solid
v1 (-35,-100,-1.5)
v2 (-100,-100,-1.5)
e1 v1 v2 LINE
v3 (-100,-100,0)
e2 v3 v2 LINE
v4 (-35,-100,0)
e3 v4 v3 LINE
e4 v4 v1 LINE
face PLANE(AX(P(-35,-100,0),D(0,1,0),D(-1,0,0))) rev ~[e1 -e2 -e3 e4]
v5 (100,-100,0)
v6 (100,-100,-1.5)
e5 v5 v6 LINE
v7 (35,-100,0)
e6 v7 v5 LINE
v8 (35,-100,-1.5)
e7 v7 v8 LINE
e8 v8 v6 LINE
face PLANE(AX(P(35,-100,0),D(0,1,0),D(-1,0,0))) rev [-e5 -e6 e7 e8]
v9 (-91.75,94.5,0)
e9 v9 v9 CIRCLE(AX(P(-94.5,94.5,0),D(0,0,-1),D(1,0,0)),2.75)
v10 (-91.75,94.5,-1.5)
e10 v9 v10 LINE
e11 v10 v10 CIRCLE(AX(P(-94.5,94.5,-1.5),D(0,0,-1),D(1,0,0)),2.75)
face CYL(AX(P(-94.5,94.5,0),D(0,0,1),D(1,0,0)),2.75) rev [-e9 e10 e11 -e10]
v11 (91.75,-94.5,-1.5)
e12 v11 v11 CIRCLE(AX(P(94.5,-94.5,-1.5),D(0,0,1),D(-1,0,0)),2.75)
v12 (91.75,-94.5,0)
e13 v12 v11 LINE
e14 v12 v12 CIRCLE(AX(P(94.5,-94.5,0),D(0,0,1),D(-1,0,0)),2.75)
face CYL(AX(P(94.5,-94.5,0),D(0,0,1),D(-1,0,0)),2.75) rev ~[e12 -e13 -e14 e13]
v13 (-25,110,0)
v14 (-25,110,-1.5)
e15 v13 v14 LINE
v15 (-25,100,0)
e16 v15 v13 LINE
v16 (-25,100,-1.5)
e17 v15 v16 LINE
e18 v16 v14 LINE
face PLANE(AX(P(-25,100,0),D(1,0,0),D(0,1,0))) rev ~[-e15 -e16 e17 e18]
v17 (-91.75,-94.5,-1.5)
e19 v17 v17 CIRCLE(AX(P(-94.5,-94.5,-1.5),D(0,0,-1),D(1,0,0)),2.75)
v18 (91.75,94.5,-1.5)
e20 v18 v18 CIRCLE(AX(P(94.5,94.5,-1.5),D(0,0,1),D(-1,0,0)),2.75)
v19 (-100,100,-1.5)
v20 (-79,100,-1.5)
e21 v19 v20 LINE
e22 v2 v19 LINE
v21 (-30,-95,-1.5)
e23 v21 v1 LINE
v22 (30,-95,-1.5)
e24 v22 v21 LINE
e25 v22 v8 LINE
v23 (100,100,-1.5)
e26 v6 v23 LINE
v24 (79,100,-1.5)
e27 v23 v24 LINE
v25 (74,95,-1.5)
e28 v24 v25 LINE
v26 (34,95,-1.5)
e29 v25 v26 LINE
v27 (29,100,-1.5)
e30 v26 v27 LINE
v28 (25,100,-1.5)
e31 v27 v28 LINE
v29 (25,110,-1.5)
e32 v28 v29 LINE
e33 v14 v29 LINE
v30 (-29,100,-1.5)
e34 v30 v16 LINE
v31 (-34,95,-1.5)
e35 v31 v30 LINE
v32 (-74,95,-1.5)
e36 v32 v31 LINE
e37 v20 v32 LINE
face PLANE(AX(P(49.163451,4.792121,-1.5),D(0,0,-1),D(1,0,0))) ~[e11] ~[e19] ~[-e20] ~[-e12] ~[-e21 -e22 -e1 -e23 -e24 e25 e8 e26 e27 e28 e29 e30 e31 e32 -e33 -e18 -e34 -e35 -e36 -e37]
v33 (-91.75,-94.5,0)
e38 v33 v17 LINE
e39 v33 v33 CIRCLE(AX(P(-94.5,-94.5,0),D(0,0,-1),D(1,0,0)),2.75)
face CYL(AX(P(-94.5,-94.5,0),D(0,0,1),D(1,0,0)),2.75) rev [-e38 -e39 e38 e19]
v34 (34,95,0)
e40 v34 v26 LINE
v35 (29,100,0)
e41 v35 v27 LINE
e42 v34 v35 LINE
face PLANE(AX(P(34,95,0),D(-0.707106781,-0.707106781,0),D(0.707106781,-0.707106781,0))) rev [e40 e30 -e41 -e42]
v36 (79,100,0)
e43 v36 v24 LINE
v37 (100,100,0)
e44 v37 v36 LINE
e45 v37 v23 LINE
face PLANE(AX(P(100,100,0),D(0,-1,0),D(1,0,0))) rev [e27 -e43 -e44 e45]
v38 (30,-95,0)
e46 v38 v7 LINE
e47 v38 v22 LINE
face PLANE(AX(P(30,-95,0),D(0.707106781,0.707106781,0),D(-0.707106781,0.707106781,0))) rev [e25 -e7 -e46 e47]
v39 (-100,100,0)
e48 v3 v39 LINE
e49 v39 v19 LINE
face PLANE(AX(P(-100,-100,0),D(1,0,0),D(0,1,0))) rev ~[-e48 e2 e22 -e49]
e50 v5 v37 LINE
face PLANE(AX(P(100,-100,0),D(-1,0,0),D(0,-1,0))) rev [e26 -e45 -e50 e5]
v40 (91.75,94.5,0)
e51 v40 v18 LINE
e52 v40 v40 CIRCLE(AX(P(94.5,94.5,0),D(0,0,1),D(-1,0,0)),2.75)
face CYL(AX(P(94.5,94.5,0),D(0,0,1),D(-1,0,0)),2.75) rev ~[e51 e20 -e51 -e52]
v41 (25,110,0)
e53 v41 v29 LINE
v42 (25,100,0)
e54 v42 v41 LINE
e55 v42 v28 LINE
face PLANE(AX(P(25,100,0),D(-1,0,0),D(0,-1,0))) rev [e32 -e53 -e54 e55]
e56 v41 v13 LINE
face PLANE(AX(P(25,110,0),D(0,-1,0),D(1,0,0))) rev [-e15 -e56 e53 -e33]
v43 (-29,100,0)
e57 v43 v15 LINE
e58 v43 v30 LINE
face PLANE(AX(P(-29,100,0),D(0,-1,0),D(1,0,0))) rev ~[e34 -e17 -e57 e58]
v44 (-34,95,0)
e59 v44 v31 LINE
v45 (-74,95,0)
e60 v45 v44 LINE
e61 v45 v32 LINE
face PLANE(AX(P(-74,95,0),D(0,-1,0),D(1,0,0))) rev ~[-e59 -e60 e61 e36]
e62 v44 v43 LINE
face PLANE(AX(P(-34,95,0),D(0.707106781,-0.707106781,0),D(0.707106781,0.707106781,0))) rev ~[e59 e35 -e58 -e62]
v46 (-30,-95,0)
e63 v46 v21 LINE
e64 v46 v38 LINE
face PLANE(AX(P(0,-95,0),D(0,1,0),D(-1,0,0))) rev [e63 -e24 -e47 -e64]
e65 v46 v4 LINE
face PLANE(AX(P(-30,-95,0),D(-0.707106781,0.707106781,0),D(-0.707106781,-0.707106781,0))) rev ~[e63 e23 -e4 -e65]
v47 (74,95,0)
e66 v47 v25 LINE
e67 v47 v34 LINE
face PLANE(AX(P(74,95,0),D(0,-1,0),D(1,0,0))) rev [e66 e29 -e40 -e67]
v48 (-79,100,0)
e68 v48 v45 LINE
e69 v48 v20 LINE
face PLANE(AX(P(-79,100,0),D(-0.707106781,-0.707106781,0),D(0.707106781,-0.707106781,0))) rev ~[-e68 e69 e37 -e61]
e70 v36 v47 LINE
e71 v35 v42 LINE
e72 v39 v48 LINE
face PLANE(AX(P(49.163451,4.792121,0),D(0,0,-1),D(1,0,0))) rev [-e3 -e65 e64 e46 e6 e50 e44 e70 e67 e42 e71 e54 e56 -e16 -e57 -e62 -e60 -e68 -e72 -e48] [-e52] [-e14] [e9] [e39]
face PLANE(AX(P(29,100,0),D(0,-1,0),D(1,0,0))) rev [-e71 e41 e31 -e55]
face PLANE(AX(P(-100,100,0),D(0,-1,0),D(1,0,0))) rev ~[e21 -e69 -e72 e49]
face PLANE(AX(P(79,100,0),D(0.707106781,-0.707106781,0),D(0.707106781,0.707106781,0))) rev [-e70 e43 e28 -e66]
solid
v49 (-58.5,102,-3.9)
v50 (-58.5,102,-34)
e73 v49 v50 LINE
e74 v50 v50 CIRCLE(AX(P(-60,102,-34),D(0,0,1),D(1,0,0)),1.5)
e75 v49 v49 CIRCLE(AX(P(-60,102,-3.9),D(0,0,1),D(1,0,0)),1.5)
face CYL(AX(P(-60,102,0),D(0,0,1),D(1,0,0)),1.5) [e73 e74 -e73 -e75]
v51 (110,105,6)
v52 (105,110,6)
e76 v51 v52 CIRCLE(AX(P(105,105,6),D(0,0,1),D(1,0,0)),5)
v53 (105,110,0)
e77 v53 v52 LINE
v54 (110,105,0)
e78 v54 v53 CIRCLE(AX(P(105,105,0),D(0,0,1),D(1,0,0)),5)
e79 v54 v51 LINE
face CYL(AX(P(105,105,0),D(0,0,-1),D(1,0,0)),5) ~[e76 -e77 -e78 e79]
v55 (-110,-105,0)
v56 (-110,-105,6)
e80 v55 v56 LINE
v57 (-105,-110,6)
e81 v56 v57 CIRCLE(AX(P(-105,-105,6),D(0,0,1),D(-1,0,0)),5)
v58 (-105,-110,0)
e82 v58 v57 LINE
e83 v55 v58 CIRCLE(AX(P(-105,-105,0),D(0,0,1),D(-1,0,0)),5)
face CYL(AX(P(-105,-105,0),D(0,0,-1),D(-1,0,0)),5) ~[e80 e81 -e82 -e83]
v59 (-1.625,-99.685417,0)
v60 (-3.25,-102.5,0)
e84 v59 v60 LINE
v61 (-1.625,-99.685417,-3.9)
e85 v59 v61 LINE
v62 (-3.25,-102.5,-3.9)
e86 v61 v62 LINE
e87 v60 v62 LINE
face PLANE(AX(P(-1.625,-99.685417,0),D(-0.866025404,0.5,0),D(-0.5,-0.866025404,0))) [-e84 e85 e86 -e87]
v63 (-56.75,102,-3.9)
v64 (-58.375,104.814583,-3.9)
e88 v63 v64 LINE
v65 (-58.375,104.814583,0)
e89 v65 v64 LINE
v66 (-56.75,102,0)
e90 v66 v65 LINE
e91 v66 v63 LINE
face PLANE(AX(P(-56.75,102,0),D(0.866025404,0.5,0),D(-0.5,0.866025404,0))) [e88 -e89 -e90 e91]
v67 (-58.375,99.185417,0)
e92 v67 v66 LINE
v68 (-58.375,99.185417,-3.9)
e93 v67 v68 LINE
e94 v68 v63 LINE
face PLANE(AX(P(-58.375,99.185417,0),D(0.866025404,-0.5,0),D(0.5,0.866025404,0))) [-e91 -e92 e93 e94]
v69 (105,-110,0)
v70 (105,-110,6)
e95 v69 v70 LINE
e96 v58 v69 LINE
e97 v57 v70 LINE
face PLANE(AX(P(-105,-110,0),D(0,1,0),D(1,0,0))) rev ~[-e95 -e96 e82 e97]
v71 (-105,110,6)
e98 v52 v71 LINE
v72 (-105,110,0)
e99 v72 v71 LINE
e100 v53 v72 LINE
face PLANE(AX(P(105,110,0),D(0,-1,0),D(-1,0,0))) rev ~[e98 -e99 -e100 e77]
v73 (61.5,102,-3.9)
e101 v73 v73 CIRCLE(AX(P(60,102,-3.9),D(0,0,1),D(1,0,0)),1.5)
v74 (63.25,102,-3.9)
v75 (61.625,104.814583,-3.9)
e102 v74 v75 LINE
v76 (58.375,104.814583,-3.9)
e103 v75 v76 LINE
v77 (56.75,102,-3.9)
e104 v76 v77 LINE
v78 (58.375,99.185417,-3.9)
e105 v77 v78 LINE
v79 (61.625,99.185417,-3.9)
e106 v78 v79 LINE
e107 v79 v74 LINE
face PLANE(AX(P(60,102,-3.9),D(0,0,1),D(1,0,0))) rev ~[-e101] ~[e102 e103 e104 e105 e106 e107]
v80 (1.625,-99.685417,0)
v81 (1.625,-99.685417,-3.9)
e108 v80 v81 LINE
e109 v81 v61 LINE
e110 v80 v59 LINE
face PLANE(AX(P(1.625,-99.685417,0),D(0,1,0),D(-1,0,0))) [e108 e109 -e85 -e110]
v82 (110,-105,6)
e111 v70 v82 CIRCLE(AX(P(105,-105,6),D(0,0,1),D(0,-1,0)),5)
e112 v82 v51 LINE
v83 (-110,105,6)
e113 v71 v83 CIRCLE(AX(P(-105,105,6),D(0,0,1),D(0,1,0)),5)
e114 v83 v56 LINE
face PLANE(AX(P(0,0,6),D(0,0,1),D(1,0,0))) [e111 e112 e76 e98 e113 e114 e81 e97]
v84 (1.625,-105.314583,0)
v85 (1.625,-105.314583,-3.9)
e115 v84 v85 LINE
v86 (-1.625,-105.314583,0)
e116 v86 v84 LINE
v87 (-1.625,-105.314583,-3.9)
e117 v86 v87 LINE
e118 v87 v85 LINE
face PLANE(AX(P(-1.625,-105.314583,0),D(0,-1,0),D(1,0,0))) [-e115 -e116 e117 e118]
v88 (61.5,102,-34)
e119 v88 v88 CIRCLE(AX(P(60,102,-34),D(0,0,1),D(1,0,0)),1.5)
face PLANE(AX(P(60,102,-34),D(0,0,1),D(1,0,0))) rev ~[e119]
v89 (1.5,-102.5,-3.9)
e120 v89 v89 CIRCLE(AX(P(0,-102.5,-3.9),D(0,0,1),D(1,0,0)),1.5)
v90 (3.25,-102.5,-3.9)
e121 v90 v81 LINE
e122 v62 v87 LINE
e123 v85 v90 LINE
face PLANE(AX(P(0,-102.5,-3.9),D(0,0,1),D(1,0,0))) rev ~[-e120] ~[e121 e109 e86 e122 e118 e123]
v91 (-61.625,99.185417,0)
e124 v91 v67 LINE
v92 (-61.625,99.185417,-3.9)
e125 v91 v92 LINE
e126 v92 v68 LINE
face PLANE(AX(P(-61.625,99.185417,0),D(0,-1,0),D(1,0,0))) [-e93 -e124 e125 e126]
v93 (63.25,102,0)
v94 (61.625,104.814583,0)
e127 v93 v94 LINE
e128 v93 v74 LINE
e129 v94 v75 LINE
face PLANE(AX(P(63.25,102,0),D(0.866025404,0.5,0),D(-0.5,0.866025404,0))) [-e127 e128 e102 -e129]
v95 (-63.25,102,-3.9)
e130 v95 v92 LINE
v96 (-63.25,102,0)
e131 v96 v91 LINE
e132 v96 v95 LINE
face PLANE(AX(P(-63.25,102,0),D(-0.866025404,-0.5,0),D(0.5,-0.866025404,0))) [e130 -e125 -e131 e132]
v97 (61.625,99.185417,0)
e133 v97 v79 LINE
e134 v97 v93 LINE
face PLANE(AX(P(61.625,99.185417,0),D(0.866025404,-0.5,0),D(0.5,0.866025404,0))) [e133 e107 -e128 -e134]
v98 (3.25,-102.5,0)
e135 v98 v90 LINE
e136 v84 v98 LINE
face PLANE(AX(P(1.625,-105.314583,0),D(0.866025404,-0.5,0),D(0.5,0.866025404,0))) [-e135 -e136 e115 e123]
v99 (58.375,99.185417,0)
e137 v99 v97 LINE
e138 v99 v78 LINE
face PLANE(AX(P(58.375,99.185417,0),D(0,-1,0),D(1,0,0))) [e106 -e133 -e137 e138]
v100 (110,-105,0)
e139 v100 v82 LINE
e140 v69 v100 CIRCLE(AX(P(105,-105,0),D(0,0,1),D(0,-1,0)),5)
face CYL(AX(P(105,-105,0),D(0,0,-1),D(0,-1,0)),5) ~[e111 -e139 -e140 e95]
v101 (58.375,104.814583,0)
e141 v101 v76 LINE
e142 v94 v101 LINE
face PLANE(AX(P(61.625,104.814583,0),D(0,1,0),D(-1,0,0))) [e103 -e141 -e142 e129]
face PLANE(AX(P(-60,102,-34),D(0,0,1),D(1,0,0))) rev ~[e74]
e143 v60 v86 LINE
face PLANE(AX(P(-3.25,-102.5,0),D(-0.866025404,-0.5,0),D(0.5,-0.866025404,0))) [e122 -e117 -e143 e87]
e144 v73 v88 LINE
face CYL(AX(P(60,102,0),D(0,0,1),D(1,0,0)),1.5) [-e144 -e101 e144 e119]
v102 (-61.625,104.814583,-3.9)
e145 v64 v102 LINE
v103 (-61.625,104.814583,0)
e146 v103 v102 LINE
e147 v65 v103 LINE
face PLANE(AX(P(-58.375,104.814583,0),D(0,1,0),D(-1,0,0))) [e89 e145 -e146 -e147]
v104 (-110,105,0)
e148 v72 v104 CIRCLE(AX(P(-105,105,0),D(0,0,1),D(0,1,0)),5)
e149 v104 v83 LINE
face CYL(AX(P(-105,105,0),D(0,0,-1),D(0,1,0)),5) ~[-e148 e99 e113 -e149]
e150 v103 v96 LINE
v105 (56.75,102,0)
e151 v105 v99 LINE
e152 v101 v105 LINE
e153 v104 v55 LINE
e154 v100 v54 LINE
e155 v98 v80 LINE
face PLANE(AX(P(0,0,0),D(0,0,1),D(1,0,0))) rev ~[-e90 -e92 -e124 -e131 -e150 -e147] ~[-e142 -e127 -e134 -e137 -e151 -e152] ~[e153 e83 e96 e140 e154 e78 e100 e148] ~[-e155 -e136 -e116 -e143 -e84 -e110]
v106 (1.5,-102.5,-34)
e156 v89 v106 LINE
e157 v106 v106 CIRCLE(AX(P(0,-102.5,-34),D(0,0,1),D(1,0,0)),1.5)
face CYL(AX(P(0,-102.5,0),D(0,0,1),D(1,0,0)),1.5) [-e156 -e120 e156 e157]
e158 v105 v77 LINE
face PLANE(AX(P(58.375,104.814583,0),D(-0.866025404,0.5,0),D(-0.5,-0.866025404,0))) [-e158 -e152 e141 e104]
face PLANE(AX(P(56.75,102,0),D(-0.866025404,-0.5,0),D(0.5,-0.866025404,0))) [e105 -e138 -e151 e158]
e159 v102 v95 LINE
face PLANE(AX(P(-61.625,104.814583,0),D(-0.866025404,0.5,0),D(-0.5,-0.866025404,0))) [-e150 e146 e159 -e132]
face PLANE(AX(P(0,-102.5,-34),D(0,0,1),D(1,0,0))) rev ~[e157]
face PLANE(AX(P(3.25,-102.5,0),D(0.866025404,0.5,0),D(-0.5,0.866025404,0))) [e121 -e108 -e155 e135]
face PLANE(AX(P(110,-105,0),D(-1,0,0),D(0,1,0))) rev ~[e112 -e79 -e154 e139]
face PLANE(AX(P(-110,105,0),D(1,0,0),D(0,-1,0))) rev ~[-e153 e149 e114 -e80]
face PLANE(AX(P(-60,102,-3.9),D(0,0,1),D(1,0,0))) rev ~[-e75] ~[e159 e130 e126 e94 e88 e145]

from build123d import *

# Parameters (mm, degrees)
F1_DEPTH = 6
F2_R     = 1.5
F3_DEPTH = 34
F5_DEPTH = 3.9
F6_R     = 2.75
F7_DEPTH = 1.5


with BuildPart() as f1:
    # F0 (on Top) → F1 (new body)
    with BuildSketch(Plane.XY):
        with BuildLine():
            Line((-105, -110), (105, -110))
            ThreePointArc((105, -110), (108.5355339059, -108.5355339059), (110, -105))
            Line((110, -105), (110, 105))
            ThreePointArc((110, 105), (108.5355339059, 108.5355339059), (105, 110))
            Line((105, 110), (-105, 110))
            ThreePointArc((-105, 110), (-108.5355339059, 108.5355339059), (-110, 105))
            Line((-110, 105), (-110, -105))
            ThreePointArc((-110, -105), (-108.5355339059, -108.5355339059), (-105, -110))
        make_face()
    extrude(amount=F1_DEPTH)

    # F2 (on Top) → F3 (join)
    with BuildSketch(Plane.XY):
        with Locations((0, -102.5)):
            Circle(F2_R)
        with Locations((-60, 102)):
            Circle(F2_R)
        with Locations((60, 102)):
            Circle(F2_R)
    extrude(amount=-F3_DEPTH)

    # F4 (on Top) → F5 (join)
    with BuildSketch(Plane.XY):
        Polygon((-1.625, -105.3145825623), (1.625, -105.3145825623), (3.25, -102.5), (1.625, -99.6854174377), (-1.625, -99.6854174377), (-3.25, -102.5), align=None)
        Polygon((58.375, 104.8145825623), (56.75, 102), (58.375, 99.1854174377), (61.625, 99.1854174377), (63.25, 102), (61.625, 104.8145825623), align=None)
        Polygon((-58.375, 104.8145825623), (-61.625, 104.8145825623), (-63.25, 102), (-61.625, 99.1854174377), (-58.375, 99.1854174377), (-56.75, 102), align=None)
    extrude(amount=-F5_DEPTH)


with BuildPart() as f7:
    # F6 (on face) → F7 (new body)
    with BuildSketch(Plane(origin=(0, 0, 0), x_dir=(1, 0, 0), z_dir=(0, 0, -1))):
        Polygon((-35, 100), (-100, 100), (-100, -100), (-79, -100), (-74, -95), (-34, -95), (-29, -100), (-25, -100), (-25, -110), (0, -110), (0, 95), (-30, 95), align=None)
        with Locations((-94.5, -94.5)):
            Circle(F6_R, mode=Mode.SUBTRACT)
        with Locations((-94.5, 94.5)):
            Circle(F6_R, mode=Mode.SUBTRACT)
    extrude(amount=F7_DEPTH)

    # F8: F7 across plane


with BuildPart() as f7_1:
    add(f7.part)
    add(f7.part.mirror(Plane.YZ))


solid = Compound([f1.part, f7_1.part])
